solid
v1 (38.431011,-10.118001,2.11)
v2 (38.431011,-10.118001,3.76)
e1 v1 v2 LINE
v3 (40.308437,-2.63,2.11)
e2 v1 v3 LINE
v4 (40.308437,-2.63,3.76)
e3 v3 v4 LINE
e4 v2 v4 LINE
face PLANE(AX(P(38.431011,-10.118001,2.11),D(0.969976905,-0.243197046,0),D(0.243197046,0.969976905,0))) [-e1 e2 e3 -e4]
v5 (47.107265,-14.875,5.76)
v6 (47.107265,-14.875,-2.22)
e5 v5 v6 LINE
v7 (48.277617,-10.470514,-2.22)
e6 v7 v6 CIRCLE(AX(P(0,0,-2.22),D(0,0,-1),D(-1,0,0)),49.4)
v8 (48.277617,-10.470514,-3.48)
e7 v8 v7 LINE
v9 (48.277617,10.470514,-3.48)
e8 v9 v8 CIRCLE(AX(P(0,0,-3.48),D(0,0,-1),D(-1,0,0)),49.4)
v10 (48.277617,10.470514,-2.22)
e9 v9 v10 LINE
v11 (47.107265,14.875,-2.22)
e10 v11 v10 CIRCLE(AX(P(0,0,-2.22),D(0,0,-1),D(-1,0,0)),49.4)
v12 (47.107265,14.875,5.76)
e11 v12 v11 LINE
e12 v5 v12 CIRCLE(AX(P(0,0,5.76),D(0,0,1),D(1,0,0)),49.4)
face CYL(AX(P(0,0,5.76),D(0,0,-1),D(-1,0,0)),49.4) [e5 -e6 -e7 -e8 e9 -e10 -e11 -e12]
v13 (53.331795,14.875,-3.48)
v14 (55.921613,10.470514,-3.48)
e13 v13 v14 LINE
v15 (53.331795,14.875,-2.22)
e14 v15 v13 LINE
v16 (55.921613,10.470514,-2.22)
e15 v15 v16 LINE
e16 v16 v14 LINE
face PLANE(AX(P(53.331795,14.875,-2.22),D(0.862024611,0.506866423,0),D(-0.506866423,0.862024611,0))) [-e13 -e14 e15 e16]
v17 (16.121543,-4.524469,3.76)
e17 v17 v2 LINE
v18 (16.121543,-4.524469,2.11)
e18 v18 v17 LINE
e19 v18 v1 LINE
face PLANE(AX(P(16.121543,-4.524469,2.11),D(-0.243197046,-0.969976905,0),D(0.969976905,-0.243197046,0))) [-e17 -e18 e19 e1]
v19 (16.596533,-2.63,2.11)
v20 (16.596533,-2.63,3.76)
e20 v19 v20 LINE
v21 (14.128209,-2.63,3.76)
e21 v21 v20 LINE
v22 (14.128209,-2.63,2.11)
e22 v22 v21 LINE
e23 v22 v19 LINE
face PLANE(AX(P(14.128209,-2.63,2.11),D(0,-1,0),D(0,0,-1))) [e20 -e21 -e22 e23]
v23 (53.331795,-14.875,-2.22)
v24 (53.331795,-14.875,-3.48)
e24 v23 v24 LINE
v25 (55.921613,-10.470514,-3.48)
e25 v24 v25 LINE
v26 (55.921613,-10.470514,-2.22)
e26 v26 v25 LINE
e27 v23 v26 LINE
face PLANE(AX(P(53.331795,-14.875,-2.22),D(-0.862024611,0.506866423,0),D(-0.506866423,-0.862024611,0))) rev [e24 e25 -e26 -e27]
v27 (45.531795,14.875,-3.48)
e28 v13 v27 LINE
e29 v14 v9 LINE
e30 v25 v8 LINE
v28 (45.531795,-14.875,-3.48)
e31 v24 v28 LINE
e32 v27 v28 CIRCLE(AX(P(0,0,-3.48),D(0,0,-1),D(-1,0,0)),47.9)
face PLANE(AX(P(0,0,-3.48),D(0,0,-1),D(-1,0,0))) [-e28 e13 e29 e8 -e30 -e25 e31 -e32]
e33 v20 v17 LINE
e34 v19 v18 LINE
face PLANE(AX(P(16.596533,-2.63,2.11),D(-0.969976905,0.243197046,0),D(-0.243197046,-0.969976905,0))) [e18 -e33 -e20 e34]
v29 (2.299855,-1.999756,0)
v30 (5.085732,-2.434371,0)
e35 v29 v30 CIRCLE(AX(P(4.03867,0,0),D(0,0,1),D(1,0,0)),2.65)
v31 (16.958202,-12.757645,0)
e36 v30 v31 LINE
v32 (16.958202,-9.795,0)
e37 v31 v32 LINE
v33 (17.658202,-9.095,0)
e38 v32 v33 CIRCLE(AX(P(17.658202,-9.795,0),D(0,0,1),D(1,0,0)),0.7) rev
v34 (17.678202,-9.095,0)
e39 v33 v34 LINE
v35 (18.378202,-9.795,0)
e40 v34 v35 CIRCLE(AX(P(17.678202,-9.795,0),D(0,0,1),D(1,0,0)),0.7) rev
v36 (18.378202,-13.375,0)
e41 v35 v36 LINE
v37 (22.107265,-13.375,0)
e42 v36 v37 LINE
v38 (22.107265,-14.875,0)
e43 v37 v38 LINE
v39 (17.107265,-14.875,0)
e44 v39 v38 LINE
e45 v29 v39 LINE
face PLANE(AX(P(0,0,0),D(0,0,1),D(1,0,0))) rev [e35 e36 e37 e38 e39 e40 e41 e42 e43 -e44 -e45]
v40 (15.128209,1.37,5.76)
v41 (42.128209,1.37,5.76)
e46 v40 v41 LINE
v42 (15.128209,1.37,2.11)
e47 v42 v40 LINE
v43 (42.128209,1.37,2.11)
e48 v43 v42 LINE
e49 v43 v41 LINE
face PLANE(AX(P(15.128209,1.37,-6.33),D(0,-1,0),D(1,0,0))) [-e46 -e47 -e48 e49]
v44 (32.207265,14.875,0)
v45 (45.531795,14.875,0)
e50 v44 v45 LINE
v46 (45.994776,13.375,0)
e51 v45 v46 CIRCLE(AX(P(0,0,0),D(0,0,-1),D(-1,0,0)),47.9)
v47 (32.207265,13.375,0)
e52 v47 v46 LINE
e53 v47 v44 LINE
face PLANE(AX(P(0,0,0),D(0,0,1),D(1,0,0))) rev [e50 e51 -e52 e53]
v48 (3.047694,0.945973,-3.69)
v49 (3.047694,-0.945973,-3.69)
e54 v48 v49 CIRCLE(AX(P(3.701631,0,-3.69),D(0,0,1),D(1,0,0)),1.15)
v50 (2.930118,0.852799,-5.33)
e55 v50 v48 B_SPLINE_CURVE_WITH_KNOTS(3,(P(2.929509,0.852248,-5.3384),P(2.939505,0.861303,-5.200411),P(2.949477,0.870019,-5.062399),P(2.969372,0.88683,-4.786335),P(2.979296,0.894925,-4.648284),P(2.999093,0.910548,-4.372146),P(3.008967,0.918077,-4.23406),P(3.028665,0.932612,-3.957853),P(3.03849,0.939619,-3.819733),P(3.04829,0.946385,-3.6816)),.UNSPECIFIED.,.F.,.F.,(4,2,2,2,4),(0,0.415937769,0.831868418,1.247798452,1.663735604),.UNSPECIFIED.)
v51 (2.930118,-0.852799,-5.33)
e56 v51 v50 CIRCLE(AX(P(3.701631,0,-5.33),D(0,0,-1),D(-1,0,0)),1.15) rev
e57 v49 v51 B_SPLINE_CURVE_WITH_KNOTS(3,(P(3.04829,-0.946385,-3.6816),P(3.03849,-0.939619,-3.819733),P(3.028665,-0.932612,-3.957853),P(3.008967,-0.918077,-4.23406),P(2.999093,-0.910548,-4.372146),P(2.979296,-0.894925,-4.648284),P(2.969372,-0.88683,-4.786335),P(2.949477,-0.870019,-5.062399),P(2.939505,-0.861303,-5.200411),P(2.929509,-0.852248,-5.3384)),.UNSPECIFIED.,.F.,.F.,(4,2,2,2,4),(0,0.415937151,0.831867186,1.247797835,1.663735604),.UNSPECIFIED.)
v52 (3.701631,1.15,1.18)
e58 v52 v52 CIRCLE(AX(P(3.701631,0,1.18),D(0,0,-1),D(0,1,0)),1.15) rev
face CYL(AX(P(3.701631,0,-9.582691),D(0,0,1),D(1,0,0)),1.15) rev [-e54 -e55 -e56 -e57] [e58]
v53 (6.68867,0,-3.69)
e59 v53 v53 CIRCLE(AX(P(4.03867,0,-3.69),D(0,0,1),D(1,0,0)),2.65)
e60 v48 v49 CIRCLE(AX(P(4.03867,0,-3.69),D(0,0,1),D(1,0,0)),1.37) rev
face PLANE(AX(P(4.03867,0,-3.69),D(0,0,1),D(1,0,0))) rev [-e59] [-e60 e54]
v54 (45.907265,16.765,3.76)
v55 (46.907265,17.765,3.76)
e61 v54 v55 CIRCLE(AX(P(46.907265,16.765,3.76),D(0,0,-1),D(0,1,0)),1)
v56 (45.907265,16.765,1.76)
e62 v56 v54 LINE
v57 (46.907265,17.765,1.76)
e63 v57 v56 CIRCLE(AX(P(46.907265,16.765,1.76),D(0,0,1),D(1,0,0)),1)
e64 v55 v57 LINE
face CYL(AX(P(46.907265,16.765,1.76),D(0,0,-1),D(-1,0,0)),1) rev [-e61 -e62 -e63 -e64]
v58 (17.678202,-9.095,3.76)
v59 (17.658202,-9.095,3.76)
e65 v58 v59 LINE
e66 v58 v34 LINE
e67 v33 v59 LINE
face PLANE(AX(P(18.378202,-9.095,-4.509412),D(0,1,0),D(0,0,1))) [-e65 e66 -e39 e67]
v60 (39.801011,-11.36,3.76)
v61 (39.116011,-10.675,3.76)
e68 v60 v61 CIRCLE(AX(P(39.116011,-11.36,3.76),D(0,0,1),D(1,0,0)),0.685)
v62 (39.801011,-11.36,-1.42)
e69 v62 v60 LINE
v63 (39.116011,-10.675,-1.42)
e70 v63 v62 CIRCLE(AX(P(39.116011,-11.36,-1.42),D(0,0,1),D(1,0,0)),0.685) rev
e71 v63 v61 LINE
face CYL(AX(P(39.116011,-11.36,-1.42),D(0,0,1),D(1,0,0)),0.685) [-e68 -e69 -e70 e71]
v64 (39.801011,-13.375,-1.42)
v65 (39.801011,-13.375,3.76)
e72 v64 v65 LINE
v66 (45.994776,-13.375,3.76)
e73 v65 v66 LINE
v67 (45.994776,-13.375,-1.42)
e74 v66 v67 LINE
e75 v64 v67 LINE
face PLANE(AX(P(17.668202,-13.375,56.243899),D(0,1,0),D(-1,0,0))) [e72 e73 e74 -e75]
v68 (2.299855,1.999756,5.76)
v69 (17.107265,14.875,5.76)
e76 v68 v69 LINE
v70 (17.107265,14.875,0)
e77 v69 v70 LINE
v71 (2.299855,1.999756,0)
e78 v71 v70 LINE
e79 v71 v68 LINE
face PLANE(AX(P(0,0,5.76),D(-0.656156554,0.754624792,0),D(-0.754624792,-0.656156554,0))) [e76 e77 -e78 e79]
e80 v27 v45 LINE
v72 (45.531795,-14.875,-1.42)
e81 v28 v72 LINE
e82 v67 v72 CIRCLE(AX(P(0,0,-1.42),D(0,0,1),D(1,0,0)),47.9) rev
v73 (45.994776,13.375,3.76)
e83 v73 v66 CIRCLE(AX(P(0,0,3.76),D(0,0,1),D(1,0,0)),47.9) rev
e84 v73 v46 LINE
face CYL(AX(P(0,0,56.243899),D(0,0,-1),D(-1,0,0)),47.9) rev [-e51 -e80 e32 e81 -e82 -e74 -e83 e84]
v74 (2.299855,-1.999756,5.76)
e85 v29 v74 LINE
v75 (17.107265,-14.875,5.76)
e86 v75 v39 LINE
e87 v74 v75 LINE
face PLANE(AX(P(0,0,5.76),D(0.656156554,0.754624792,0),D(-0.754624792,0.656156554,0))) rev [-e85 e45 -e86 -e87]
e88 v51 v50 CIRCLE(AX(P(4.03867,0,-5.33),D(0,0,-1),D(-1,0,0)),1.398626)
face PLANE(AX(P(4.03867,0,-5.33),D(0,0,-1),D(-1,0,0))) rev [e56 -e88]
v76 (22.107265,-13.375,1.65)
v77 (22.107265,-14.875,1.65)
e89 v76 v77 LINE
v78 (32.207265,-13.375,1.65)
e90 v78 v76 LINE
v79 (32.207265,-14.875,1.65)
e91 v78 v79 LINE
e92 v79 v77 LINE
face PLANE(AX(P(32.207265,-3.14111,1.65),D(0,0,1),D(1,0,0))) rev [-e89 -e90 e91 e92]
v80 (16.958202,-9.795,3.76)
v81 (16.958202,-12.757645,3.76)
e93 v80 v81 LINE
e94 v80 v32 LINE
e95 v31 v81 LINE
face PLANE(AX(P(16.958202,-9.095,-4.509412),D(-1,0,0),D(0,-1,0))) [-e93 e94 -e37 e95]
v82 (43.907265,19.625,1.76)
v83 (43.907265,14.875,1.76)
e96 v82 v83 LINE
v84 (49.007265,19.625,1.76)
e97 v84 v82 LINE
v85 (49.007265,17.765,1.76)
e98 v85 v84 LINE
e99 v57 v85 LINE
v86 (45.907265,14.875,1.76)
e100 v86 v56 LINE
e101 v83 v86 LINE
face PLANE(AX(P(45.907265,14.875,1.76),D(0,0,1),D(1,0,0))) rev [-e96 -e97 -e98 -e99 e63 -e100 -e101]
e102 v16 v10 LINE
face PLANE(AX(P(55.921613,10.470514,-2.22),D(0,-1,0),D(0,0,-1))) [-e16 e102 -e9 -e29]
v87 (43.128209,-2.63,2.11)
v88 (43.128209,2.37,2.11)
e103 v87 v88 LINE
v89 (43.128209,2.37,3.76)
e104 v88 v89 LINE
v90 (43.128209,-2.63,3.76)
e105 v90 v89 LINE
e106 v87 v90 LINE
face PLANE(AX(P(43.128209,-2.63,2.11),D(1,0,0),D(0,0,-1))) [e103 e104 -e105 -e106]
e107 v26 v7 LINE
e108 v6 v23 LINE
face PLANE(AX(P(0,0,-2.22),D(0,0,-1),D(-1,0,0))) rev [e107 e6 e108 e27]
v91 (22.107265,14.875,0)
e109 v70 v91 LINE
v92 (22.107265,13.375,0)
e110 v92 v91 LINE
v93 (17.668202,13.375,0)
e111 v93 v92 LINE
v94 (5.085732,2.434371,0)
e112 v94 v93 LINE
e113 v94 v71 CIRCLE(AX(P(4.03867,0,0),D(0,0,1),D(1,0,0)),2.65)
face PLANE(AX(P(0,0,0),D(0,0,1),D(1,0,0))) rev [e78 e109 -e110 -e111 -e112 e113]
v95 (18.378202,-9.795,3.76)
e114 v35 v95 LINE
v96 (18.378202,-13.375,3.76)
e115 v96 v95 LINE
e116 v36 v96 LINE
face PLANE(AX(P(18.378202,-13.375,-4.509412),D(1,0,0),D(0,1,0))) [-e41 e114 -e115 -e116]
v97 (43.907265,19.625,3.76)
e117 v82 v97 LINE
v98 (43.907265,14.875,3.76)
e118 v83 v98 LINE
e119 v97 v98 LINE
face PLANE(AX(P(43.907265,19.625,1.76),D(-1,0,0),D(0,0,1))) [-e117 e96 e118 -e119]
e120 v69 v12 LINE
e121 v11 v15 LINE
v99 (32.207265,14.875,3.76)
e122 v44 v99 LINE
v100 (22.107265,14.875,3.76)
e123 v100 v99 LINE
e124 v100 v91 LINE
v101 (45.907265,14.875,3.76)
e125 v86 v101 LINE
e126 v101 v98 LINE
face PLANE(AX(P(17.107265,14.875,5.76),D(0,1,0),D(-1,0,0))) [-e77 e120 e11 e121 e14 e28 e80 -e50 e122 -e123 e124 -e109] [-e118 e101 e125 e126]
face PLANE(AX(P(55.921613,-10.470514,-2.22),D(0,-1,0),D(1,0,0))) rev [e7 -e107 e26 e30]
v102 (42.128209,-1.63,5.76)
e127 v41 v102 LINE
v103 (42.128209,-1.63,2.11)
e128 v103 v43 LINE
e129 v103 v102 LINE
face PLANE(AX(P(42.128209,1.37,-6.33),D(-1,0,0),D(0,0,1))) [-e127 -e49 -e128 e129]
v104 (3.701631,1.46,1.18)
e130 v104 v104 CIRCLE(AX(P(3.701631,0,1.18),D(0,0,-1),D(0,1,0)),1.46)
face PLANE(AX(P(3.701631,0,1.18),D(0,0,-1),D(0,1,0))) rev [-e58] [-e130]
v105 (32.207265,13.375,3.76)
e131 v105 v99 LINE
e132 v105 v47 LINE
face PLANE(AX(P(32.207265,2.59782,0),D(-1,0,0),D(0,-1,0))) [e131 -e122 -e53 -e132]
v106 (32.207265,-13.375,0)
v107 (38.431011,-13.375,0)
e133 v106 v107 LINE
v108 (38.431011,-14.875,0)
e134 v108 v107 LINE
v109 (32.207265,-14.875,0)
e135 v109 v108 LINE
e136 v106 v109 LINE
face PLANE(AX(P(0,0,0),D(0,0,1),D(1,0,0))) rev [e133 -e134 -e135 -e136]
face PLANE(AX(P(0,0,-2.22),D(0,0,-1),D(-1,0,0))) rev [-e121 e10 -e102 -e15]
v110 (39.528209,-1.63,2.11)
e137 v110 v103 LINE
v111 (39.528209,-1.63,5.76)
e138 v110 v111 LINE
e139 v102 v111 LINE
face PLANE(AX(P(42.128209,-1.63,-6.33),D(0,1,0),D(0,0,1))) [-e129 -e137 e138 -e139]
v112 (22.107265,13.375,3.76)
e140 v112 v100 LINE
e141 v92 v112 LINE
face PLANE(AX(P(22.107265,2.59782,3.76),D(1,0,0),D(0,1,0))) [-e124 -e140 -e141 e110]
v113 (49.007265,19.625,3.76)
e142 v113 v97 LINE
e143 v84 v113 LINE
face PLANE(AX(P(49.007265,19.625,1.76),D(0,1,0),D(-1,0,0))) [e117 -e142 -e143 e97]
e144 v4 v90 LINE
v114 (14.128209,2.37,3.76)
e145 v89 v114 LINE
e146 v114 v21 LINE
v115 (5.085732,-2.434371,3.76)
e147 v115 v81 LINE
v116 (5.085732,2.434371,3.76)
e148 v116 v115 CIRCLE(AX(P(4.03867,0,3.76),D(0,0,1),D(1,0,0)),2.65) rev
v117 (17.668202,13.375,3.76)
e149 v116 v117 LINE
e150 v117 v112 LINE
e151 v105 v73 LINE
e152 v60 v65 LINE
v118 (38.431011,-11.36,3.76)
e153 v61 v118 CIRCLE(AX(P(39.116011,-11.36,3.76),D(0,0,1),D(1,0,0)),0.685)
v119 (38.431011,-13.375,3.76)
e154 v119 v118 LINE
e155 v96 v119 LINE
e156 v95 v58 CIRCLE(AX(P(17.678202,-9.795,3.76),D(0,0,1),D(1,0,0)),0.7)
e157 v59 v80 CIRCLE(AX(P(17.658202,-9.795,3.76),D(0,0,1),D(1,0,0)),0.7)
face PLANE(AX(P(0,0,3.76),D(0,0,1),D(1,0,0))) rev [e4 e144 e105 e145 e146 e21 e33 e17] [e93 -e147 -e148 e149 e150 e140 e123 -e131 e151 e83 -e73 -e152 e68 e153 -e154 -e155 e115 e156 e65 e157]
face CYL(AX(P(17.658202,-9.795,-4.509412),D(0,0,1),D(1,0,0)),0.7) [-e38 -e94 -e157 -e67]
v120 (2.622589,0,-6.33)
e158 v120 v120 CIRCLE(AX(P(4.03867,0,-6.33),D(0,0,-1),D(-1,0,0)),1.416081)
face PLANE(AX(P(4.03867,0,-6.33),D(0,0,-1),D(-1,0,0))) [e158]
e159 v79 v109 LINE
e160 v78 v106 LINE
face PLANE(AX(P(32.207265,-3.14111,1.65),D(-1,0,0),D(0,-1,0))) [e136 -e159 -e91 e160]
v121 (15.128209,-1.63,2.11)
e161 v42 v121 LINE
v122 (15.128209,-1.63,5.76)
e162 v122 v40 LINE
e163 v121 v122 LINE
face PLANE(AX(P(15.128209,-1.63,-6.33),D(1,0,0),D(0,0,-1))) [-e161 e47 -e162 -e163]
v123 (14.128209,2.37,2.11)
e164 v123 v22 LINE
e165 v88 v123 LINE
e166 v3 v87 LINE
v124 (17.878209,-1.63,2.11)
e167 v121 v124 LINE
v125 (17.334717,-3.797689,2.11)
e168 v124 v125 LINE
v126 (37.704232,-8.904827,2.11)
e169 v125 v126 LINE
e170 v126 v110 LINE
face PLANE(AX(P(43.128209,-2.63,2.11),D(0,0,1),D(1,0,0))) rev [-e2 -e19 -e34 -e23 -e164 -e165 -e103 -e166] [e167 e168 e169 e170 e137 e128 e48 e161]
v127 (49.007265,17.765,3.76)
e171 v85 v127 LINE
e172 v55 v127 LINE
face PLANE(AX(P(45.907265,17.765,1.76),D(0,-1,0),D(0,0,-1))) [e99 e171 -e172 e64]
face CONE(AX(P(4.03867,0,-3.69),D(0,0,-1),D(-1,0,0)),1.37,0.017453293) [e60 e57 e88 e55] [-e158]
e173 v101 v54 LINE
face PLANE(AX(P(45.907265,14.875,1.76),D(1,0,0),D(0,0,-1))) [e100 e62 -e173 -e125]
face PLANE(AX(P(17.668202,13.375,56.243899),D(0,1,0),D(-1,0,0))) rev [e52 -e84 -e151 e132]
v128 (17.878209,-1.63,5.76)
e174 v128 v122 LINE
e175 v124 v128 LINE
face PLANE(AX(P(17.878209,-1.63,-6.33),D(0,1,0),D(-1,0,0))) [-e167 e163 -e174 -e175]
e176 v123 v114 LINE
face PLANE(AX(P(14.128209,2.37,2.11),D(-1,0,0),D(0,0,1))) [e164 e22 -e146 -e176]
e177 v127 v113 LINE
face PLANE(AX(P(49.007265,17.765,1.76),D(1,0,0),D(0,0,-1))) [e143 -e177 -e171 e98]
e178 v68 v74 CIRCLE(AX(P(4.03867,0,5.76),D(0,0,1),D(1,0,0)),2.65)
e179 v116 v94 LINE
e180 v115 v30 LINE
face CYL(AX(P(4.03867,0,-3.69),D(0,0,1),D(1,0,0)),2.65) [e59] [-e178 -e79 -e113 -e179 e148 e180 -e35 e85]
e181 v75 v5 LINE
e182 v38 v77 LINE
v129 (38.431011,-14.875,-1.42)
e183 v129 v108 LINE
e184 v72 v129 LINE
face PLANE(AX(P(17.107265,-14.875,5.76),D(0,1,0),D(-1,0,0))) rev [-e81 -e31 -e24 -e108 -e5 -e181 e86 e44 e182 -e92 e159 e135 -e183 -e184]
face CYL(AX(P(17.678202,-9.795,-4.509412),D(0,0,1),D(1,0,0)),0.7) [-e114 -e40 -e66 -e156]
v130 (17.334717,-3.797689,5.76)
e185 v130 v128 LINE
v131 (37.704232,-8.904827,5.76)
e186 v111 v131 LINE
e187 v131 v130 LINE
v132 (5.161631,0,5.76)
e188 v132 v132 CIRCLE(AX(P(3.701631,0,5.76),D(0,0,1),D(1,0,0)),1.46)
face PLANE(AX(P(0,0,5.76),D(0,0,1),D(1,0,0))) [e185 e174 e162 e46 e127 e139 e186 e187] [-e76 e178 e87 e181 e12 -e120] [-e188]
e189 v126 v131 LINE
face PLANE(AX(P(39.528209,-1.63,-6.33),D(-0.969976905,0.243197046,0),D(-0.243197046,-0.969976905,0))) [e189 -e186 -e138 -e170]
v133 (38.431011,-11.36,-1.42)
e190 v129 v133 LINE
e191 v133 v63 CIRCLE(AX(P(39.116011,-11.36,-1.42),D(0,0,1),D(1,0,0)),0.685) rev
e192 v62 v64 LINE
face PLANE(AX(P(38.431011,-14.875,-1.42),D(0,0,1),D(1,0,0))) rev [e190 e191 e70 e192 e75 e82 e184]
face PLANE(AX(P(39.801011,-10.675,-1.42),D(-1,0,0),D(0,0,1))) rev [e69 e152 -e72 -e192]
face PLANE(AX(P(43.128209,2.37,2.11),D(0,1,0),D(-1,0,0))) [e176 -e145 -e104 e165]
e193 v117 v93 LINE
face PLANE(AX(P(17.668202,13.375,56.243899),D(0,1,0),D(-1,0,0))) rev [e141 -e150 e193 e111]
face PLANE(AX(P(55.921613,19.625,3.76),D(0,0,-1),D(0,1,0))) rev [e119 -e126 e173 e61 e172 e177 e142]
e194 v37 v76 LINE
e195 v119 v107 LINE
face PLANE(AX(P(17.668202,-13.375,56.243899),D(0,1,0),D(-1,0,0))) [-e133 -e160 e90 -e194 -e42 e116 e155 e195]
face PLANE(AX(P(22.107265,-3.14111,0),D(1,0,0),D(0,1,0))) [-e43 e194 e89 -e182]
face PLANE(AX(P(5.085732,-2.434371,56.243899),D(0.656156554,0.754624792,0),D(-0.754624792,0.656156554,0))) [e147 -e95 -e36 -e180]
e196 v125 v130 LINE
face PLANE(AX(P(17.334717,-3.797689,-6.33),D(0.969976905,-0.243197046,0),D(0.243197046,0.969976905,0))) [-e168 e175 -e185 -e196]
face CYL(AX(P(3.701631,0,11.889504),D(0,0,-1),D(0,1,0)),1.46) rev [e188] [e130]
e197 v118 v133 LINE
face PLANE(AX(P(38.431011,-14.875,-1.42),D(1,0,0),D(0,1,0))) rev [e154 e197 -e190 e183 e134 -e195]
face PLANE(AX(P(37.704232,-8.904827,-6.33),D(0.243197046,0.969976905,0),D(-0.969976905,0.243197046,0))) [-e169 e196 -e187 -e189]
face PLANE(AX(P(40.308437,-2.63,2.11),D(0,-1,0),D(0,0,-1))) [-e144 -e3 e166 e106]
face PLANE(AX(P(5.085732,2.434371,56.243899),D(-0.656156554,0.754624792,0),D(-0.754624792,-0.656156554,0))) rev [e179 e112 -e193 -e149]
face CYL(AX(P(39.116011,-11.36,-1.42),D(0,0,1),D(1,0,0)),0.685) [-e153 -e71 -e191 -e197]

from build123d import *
from build123d.topology import SkipClean

# Parameters (mm, degrees)
BASE_EXTRUDE_DEPTH  = 5.76
SKETCH2_R           = 2.65
BOSS_EXTRUDE1_DEPTH = 9.45
CUT_EXTRUDE3_DEPTH  = 53.449290987
SKETCH4_R           = 1.37
BOSS_EXTRUDE2_DEPTH = 2.64
BOSS_EXTRUDE2_DRAFT = -1
SKETCH7_R           = 1.15
CUT_EXTRUDE4_DEPTH  = 11.09
CUT_EXTRUDE5_DEPTH  = 53.988618848
CUT_EXTRUDE6_START  = -3.76
CUT_EXTRUDE6_DEPTH  = 3.76
BOSS_EXTRUDE3_DEPTH = 1.65
SKETCH11_W          = 10.1
SKETCH11_H          = 3.76
CUT_EXTRUDE7_DEPTH  = 1.5
SKETCH12_W          = 10.1
SKETCH12_H          = 1.65
CUT_EXTRUDE8_DEPTH  = 1.5
BOSS_EXTRUDE4_DEPTH = 3.76
FILLET1_R           = 0.7
BOSS_EXTRUDE5_START = -3.76
BOSS_EXTRUDE5_DEPTH = 5.18
FILLET5_R           = 0.685
BOSS_EXTRUDE6_DEPTH = 3.48
BOSS_EXTRUDE7_START = -1.26
BOSS_EXTRUDE7_DEPTH = 1.26
BOSS_EXTRUDE8_DEPTH = 4
SKETCH18_W          = 2
SKETCH18_H          = 4.75
CUT_EXTRUDE9_DEPTH  = 48.255056695
FILLET2_R           = 1
SKETCH21_R          = 1.46
CUT_EXTRUDE13_DEPTH = 6.58


with BuildPart() as part:
    # Sketch1 → Base-Extrude (new body)
    with BuildSketch(Plane.XY):
        with BuildLine():
            Line((0, 0), (17.107264567, 14.875))
            Line((17.107264567, 14.875), (47.107264567, 14.875))
            ThreePointArc((47.107264567, 14.875), (49.4, 0), (47.107264567, -14.875))
            Line((47.107264567, -14.875), (17.107264567, -14.875))
            Line((17.107264567, -14.875), (0, 0))
        make_face()
    extrude(amount=BASE_EXTRUDE_DEPTH)

    # Sketch2 → Boss-Extrude1 (add)
    with BuildSketch(Plane.XY.offset(5.76)):
        with Locations((4.038670317, 0)):
            Circle(SKETCH2_R)
    extrude(amount=-BOSS_EXTRUDE1_DEPTH)

    # Sketch3 → Cut-Extrude3 (cut, through all)
    with SkipClean():  # the faces are left unmerged after this step: merging them gives an invalid solid
        with BuildSketch(Plane.XY.offset(5.76)):
            with BuildLine():
                Line((0, 0), (2.299855448, -1.999755698))
                ThreePointArc((2.299855448, -1.999755698), (1.388670317, 0), (2.299855448, 1.999755698))
                Line((2.299855448, 1.999755698), (0, 0))
            make_face()
        extrude(amount=-CUT_EXTRUDE3_DEPTH, mode=Mode.SUBTRACT)


with BuildPart() as boss_extrude2_tool:
    # Sketch4 → Boss-Extrude2 (with draft: the straight prism first)
    with BuildSketch(Plane(origin=(0, 0, -3.69), x_dir=(-1, 0, 0), z_dir=(0, 0, -1))):
        with Locations((-4.038670317, 0)):
            Circle(SKETCH4_R)
    extrude(amount=BOSS_EXTRUDE2_DEPTH)
    # Boss-Extrude2: the draft: its side faces are tilted about the plane it starts from
    boss_extrude2_sides = [boss_extrude2_tool.faces().sort_by_distance(p)[0] for p in [
        (5.408670317, 0, -5.01),
    ]]
    draft(boss_extrude2_sides, Plane(origin=(0, 0, -3.69), x_dir=(-1, 0, 0), z_dir=(0, 0, -1)), BOSS_EXTRUDE2_DRAFT)


with BuildPart() as part_1:
    add(part.part)

    # Boss-Extrude2: add boss_extrude2_tool
    add(boss_extrude2_tool.part)

    # Sketch7 → Cut-Extrude4 (cut)
    with SkipClean():  # the faces are left unmerged after this step: merging them gives an invalid solid
        with BuildSketch(Plane.XY.offset(5.76)):
            with Locations((3.701631462, 0)):
                Circle(SKETCH7_R)
        extrude(amount=-CUT_EXTRUDE4_DEPTH, mode=Mode.SUBTRACT)

    # Sketch8 → Cut-Extrude5 (cut, through all)
    with SkipClean():  # the faces are left unmerged after this step: merging them gives an invalid solid
        with BuildSketch(Plane.XY.offset(5.76)):
            Polygon((15.128209475, 1.37), (42.128209475, 1.37), (42.128209475, -1.63), (39.528209475, -1.63), (37.70423163, -8.90482679), (17.334716619, -3.797688825), (17.878209475, -1.63), (15.128209475, -1.63), align=None)
        extrude(amount=-CUT_EXTRUDE5_DEPTH, mode=Mode.SUBTRACT)

    # Sketch9 → Cut-Extrude6 (cut)
    with SkipClean():  # the faces are left unmerged after this step: merging them gives an invalid solid
        with BuildSketch(Plane(origin=(0, 0, 0), x_dir=(-1, 0, 0), z_dir=(0, 0, -1)).offset(CUT_EXTRUDE6_START)):
            with BuildLine():
                Line((-5.085732276, 2.434370813), (-17.66820206, 13.375))
                Line((-17.66820206, 13.375), (-45.994775519, 13.375))
                ThreePointArc((-45.994775519, 13.375), (-47.9, 0), (-45.994775519, -13.375))
                Line((-45.994775519, -13.375), (-17.66820206, -13.375))
                Line((-17.66820206, -13.375), (-5.085732276, -2.434370813))
                ThreePointArc((-5.085732276, -2.434370813), (-6.688670317, 0), (-5.085732276, 2.434370813))
            make_face()
        extrude(amount=CUT_EXTRUDE6_DEPTH, mode=Mode.SUBTRACT)

    # Sketch10 → Boss-Extrude3 (add)
    with SkipClean():  # the faces are left unmerged after this step: merging them gives an invalid solid
        with BuildSketch(Plane(origin=(0, 0, 3.76), x_dir=(-1, 0, 0), z_dir=(0, 0, -1))):
            Polygon((-43.128209475, -2.63), (-43.128209475, 2.37), (-14.128209475, 2.37), (-14.128209475, -2.63), (-16.59653252, -2.63), (-16.121542667, -4.524468684), (-38.431011489, -10.118000741), (-40.308437282, -2.63), align=None)
            Polygon((-15.128209475, 1.37), (-15.128209475, -1.63), (-17.878209475, -1.63), (-17.334716619, -3.797688825), (-37.70423163, -8.90482679), (-39.528209475, -1.63), (-42.128209475, -1.63), (-42.128209475, 1.37), align=None, mode=Mode.SUBTRACT)
        extrude(amount=BOSS_EXTRUDE3_DEPTH)

    # Sketch11 → Cut-Extrude7 (cut)
    with SkipClean():  # the faces are left unmerged after this step: merging them gives an invalid solid
        with BuildSketch(Plane(origin=(0, 14.875, 0), x_dir=(-1, 0, 0), z_dir=(0, 1, 0))):
            with Locations((-27.157264567, 1.88)):
                Rectangle(SKETCH11_W, SKETCH11_H)
        extrude(amount=-CUT_EXTRUDE7_DEPTH, mode=Mode.SUBTRACT)

    # Sketch12 → Cut-Extrude8 (cut)
    with BuildSketch(Plane.XZ.offset(14.875)):
        with Locations((27.157264567, 0.825)):
            Rectangle(SKETCH12_W, SKETCH12_H)
    extrude(amount=-CUT_EXTRUDE8_DEPTH, mode=Mode.SUBTRACT)

    # Sketch13 → Boss-Extrude4 (add)
    with BuildSketch(Plane(origin=(0, 0, 3.76), x_dir=(-1, 0, 0), z_dir=(0, 0, -1))):
        Polygon((-18.37820206, -13.375), (-18.37820206, -9.095), (-16.95820206, -9.095), (-16.95820206, -12.757645311), (-17.66820206, -13.375), align=None)
    extrude(amount=BOSS_EXTRUDE4_DEPTH)

    # Fillet1
    fillet1_edges = [part_1.edges().sort_by_distance(p)[0] for p in [
        (16.95820206, -9.095, 1.88),
        (18.37820206, -9.095, 1.88),
    ]]
    fillet(fillet1_edges, radius=FILLET1_R)

    # Sketch14 → Boss-Extrude5 (add)
    with BuildSketch(Plane(origin=(0, 0, 0), x_dir=(-1, 0, 0), z_dir=(0, 0, -1)).offset(BOSS_EXTRUDE5_START)):
        Polygon((-38.431011489, -10.675), (-39.801011489, -10.675), (-39.801011489, -13.375), (-45.994775519, -13.375), (-47.107264567, -14.875), (-38.431011489, -14.875), align=None)
    extrude(amount=BOSS_EXTRUDE5_DEPTH)

    # Fillet5
    fillet5_edges = [part_1.edges().sort_by_distance(p)[0] for p in [
        (38.431011489, -10.675, 1.17),
        (39.801011489, -10.675, 1.17),
    ]]
    fillet(fillet5_edges, radius=FILLET5_R - 0.0001)  # a hair under: the kernel refuses the full size

    # Sketch15 → Boss-Extrude6 (add)
    with BuildSketch(Plane(origin=(0, 0, 0), x_dir=(-1, 0, 0), z_dir=(0, 0, -1))):
        with BuildLine():
            Line((-47.107264567, 14.875), (-45.53179521, 14.875))
            ThreePointArc((-45.53179521, 14.875), (-47.9, 0), (-45.53179521, -14.875))
            Line((-45.53179521, -14.875), (-47.107264567, -14.875))
            ThreePointArc((-47.107264567, -14.875), (-49.4, 0), (-47.107264567, 14.875))
        make_face()
    extrude(amount=BOSS_EXTRUDE6_DEPTH)

    # Sketch16 → Boss-Extrude7 (add)
    with BuildSketch(Plane(origin=(0, 0, -3.48), x_dir=(-1, 0, 0), z_dir=(0, 0, -1)).offset(BOSS_EXTRUDE7_START)):
        with BuildLine():
            Line((-47.107264567, -14.875), (-45.53179521, -14.875))
            ThreePointArc((-45.53179521, -14.875), (-46.189233829, -12.687185592), (-46.741612583, -10.470513507))
            Line((-46.741612583, -10.470513507), (-55.921612583, -10.470513507))
            Line((-55.921612583, -10.470513507), (-53.33179521, -14.875))
            Line((-53.33179521, -14.875), (-47.107264567, -14.875))
        make_face()
        with BuildLine():
            Line((-47.107264567, 14.875), (-45.53179521, 14.875))
            ThreePointArc((-45.53179521, 14.875), (-46.189233829, 12.687185592), (-46.741612583, 10.470513507))
            Line((-46.741612583, 10.470513507), (-55.921612583, 10.470513507))
            Line((-55.921612583, 10.470513507), (-53.33179521, 14.875))
            Line((-53.33179521, 14.875), (-47.107264567, 14.875))
        make_face()
    extrude(amount=BOSS_EXTRUDE7_DEPTH)

    # Sketch17 → Boss-Extrude8 (add)
    with BuildSketch(Plane.XY.offset(5.76)):
        Polygon((45.907264567, 14.875), (45.907264567, 17.765), (49.007264567, 17.765), (49.007264567, 19.625), (43.907264567, 19.625), (43.907264567, 14.875), align=None)
    extrude(amount=-BOSS_EXTRUDE8_DEPTH)

    # Sketch18 → Cut-Extrude9 (cut, through all)
    with BuildSketch(Plane.ZY.offset(-43.907264567)):
        with Locations((4.76, 17.25)):
            Rectangle(SKETCH18_W, SKETCH18_H)
    extrude(amount=-CUT_EXTRUDE9_DEPTH, mode=Mode.SUBTRACT)

    # Fillet2
    fillet2_edges = [part_1.edges().sort_by_distance(p)[0] for p in [
        (45.907264567, 17.765, 2.76),
    ]]
    fillet(fillet2_edges, radius=FILLET2_R)

    # Sketch21 → Cut-Extrude13 (cut)
    with BuildSketch(Plane(origin=(0, 0, 1.18), x_dir=(-1, 0, 0), z_dir=(0, 0, -1))):
        with Locations(Location((-3.701631462, 0, 0), (0, 0, 90))):
            Circle(SKETCH21_R)
    extrude(amount=-CUT_EXTRUDE13_DEPTH, mode=Mode.SUBTRACT)


solid = part_1.part
